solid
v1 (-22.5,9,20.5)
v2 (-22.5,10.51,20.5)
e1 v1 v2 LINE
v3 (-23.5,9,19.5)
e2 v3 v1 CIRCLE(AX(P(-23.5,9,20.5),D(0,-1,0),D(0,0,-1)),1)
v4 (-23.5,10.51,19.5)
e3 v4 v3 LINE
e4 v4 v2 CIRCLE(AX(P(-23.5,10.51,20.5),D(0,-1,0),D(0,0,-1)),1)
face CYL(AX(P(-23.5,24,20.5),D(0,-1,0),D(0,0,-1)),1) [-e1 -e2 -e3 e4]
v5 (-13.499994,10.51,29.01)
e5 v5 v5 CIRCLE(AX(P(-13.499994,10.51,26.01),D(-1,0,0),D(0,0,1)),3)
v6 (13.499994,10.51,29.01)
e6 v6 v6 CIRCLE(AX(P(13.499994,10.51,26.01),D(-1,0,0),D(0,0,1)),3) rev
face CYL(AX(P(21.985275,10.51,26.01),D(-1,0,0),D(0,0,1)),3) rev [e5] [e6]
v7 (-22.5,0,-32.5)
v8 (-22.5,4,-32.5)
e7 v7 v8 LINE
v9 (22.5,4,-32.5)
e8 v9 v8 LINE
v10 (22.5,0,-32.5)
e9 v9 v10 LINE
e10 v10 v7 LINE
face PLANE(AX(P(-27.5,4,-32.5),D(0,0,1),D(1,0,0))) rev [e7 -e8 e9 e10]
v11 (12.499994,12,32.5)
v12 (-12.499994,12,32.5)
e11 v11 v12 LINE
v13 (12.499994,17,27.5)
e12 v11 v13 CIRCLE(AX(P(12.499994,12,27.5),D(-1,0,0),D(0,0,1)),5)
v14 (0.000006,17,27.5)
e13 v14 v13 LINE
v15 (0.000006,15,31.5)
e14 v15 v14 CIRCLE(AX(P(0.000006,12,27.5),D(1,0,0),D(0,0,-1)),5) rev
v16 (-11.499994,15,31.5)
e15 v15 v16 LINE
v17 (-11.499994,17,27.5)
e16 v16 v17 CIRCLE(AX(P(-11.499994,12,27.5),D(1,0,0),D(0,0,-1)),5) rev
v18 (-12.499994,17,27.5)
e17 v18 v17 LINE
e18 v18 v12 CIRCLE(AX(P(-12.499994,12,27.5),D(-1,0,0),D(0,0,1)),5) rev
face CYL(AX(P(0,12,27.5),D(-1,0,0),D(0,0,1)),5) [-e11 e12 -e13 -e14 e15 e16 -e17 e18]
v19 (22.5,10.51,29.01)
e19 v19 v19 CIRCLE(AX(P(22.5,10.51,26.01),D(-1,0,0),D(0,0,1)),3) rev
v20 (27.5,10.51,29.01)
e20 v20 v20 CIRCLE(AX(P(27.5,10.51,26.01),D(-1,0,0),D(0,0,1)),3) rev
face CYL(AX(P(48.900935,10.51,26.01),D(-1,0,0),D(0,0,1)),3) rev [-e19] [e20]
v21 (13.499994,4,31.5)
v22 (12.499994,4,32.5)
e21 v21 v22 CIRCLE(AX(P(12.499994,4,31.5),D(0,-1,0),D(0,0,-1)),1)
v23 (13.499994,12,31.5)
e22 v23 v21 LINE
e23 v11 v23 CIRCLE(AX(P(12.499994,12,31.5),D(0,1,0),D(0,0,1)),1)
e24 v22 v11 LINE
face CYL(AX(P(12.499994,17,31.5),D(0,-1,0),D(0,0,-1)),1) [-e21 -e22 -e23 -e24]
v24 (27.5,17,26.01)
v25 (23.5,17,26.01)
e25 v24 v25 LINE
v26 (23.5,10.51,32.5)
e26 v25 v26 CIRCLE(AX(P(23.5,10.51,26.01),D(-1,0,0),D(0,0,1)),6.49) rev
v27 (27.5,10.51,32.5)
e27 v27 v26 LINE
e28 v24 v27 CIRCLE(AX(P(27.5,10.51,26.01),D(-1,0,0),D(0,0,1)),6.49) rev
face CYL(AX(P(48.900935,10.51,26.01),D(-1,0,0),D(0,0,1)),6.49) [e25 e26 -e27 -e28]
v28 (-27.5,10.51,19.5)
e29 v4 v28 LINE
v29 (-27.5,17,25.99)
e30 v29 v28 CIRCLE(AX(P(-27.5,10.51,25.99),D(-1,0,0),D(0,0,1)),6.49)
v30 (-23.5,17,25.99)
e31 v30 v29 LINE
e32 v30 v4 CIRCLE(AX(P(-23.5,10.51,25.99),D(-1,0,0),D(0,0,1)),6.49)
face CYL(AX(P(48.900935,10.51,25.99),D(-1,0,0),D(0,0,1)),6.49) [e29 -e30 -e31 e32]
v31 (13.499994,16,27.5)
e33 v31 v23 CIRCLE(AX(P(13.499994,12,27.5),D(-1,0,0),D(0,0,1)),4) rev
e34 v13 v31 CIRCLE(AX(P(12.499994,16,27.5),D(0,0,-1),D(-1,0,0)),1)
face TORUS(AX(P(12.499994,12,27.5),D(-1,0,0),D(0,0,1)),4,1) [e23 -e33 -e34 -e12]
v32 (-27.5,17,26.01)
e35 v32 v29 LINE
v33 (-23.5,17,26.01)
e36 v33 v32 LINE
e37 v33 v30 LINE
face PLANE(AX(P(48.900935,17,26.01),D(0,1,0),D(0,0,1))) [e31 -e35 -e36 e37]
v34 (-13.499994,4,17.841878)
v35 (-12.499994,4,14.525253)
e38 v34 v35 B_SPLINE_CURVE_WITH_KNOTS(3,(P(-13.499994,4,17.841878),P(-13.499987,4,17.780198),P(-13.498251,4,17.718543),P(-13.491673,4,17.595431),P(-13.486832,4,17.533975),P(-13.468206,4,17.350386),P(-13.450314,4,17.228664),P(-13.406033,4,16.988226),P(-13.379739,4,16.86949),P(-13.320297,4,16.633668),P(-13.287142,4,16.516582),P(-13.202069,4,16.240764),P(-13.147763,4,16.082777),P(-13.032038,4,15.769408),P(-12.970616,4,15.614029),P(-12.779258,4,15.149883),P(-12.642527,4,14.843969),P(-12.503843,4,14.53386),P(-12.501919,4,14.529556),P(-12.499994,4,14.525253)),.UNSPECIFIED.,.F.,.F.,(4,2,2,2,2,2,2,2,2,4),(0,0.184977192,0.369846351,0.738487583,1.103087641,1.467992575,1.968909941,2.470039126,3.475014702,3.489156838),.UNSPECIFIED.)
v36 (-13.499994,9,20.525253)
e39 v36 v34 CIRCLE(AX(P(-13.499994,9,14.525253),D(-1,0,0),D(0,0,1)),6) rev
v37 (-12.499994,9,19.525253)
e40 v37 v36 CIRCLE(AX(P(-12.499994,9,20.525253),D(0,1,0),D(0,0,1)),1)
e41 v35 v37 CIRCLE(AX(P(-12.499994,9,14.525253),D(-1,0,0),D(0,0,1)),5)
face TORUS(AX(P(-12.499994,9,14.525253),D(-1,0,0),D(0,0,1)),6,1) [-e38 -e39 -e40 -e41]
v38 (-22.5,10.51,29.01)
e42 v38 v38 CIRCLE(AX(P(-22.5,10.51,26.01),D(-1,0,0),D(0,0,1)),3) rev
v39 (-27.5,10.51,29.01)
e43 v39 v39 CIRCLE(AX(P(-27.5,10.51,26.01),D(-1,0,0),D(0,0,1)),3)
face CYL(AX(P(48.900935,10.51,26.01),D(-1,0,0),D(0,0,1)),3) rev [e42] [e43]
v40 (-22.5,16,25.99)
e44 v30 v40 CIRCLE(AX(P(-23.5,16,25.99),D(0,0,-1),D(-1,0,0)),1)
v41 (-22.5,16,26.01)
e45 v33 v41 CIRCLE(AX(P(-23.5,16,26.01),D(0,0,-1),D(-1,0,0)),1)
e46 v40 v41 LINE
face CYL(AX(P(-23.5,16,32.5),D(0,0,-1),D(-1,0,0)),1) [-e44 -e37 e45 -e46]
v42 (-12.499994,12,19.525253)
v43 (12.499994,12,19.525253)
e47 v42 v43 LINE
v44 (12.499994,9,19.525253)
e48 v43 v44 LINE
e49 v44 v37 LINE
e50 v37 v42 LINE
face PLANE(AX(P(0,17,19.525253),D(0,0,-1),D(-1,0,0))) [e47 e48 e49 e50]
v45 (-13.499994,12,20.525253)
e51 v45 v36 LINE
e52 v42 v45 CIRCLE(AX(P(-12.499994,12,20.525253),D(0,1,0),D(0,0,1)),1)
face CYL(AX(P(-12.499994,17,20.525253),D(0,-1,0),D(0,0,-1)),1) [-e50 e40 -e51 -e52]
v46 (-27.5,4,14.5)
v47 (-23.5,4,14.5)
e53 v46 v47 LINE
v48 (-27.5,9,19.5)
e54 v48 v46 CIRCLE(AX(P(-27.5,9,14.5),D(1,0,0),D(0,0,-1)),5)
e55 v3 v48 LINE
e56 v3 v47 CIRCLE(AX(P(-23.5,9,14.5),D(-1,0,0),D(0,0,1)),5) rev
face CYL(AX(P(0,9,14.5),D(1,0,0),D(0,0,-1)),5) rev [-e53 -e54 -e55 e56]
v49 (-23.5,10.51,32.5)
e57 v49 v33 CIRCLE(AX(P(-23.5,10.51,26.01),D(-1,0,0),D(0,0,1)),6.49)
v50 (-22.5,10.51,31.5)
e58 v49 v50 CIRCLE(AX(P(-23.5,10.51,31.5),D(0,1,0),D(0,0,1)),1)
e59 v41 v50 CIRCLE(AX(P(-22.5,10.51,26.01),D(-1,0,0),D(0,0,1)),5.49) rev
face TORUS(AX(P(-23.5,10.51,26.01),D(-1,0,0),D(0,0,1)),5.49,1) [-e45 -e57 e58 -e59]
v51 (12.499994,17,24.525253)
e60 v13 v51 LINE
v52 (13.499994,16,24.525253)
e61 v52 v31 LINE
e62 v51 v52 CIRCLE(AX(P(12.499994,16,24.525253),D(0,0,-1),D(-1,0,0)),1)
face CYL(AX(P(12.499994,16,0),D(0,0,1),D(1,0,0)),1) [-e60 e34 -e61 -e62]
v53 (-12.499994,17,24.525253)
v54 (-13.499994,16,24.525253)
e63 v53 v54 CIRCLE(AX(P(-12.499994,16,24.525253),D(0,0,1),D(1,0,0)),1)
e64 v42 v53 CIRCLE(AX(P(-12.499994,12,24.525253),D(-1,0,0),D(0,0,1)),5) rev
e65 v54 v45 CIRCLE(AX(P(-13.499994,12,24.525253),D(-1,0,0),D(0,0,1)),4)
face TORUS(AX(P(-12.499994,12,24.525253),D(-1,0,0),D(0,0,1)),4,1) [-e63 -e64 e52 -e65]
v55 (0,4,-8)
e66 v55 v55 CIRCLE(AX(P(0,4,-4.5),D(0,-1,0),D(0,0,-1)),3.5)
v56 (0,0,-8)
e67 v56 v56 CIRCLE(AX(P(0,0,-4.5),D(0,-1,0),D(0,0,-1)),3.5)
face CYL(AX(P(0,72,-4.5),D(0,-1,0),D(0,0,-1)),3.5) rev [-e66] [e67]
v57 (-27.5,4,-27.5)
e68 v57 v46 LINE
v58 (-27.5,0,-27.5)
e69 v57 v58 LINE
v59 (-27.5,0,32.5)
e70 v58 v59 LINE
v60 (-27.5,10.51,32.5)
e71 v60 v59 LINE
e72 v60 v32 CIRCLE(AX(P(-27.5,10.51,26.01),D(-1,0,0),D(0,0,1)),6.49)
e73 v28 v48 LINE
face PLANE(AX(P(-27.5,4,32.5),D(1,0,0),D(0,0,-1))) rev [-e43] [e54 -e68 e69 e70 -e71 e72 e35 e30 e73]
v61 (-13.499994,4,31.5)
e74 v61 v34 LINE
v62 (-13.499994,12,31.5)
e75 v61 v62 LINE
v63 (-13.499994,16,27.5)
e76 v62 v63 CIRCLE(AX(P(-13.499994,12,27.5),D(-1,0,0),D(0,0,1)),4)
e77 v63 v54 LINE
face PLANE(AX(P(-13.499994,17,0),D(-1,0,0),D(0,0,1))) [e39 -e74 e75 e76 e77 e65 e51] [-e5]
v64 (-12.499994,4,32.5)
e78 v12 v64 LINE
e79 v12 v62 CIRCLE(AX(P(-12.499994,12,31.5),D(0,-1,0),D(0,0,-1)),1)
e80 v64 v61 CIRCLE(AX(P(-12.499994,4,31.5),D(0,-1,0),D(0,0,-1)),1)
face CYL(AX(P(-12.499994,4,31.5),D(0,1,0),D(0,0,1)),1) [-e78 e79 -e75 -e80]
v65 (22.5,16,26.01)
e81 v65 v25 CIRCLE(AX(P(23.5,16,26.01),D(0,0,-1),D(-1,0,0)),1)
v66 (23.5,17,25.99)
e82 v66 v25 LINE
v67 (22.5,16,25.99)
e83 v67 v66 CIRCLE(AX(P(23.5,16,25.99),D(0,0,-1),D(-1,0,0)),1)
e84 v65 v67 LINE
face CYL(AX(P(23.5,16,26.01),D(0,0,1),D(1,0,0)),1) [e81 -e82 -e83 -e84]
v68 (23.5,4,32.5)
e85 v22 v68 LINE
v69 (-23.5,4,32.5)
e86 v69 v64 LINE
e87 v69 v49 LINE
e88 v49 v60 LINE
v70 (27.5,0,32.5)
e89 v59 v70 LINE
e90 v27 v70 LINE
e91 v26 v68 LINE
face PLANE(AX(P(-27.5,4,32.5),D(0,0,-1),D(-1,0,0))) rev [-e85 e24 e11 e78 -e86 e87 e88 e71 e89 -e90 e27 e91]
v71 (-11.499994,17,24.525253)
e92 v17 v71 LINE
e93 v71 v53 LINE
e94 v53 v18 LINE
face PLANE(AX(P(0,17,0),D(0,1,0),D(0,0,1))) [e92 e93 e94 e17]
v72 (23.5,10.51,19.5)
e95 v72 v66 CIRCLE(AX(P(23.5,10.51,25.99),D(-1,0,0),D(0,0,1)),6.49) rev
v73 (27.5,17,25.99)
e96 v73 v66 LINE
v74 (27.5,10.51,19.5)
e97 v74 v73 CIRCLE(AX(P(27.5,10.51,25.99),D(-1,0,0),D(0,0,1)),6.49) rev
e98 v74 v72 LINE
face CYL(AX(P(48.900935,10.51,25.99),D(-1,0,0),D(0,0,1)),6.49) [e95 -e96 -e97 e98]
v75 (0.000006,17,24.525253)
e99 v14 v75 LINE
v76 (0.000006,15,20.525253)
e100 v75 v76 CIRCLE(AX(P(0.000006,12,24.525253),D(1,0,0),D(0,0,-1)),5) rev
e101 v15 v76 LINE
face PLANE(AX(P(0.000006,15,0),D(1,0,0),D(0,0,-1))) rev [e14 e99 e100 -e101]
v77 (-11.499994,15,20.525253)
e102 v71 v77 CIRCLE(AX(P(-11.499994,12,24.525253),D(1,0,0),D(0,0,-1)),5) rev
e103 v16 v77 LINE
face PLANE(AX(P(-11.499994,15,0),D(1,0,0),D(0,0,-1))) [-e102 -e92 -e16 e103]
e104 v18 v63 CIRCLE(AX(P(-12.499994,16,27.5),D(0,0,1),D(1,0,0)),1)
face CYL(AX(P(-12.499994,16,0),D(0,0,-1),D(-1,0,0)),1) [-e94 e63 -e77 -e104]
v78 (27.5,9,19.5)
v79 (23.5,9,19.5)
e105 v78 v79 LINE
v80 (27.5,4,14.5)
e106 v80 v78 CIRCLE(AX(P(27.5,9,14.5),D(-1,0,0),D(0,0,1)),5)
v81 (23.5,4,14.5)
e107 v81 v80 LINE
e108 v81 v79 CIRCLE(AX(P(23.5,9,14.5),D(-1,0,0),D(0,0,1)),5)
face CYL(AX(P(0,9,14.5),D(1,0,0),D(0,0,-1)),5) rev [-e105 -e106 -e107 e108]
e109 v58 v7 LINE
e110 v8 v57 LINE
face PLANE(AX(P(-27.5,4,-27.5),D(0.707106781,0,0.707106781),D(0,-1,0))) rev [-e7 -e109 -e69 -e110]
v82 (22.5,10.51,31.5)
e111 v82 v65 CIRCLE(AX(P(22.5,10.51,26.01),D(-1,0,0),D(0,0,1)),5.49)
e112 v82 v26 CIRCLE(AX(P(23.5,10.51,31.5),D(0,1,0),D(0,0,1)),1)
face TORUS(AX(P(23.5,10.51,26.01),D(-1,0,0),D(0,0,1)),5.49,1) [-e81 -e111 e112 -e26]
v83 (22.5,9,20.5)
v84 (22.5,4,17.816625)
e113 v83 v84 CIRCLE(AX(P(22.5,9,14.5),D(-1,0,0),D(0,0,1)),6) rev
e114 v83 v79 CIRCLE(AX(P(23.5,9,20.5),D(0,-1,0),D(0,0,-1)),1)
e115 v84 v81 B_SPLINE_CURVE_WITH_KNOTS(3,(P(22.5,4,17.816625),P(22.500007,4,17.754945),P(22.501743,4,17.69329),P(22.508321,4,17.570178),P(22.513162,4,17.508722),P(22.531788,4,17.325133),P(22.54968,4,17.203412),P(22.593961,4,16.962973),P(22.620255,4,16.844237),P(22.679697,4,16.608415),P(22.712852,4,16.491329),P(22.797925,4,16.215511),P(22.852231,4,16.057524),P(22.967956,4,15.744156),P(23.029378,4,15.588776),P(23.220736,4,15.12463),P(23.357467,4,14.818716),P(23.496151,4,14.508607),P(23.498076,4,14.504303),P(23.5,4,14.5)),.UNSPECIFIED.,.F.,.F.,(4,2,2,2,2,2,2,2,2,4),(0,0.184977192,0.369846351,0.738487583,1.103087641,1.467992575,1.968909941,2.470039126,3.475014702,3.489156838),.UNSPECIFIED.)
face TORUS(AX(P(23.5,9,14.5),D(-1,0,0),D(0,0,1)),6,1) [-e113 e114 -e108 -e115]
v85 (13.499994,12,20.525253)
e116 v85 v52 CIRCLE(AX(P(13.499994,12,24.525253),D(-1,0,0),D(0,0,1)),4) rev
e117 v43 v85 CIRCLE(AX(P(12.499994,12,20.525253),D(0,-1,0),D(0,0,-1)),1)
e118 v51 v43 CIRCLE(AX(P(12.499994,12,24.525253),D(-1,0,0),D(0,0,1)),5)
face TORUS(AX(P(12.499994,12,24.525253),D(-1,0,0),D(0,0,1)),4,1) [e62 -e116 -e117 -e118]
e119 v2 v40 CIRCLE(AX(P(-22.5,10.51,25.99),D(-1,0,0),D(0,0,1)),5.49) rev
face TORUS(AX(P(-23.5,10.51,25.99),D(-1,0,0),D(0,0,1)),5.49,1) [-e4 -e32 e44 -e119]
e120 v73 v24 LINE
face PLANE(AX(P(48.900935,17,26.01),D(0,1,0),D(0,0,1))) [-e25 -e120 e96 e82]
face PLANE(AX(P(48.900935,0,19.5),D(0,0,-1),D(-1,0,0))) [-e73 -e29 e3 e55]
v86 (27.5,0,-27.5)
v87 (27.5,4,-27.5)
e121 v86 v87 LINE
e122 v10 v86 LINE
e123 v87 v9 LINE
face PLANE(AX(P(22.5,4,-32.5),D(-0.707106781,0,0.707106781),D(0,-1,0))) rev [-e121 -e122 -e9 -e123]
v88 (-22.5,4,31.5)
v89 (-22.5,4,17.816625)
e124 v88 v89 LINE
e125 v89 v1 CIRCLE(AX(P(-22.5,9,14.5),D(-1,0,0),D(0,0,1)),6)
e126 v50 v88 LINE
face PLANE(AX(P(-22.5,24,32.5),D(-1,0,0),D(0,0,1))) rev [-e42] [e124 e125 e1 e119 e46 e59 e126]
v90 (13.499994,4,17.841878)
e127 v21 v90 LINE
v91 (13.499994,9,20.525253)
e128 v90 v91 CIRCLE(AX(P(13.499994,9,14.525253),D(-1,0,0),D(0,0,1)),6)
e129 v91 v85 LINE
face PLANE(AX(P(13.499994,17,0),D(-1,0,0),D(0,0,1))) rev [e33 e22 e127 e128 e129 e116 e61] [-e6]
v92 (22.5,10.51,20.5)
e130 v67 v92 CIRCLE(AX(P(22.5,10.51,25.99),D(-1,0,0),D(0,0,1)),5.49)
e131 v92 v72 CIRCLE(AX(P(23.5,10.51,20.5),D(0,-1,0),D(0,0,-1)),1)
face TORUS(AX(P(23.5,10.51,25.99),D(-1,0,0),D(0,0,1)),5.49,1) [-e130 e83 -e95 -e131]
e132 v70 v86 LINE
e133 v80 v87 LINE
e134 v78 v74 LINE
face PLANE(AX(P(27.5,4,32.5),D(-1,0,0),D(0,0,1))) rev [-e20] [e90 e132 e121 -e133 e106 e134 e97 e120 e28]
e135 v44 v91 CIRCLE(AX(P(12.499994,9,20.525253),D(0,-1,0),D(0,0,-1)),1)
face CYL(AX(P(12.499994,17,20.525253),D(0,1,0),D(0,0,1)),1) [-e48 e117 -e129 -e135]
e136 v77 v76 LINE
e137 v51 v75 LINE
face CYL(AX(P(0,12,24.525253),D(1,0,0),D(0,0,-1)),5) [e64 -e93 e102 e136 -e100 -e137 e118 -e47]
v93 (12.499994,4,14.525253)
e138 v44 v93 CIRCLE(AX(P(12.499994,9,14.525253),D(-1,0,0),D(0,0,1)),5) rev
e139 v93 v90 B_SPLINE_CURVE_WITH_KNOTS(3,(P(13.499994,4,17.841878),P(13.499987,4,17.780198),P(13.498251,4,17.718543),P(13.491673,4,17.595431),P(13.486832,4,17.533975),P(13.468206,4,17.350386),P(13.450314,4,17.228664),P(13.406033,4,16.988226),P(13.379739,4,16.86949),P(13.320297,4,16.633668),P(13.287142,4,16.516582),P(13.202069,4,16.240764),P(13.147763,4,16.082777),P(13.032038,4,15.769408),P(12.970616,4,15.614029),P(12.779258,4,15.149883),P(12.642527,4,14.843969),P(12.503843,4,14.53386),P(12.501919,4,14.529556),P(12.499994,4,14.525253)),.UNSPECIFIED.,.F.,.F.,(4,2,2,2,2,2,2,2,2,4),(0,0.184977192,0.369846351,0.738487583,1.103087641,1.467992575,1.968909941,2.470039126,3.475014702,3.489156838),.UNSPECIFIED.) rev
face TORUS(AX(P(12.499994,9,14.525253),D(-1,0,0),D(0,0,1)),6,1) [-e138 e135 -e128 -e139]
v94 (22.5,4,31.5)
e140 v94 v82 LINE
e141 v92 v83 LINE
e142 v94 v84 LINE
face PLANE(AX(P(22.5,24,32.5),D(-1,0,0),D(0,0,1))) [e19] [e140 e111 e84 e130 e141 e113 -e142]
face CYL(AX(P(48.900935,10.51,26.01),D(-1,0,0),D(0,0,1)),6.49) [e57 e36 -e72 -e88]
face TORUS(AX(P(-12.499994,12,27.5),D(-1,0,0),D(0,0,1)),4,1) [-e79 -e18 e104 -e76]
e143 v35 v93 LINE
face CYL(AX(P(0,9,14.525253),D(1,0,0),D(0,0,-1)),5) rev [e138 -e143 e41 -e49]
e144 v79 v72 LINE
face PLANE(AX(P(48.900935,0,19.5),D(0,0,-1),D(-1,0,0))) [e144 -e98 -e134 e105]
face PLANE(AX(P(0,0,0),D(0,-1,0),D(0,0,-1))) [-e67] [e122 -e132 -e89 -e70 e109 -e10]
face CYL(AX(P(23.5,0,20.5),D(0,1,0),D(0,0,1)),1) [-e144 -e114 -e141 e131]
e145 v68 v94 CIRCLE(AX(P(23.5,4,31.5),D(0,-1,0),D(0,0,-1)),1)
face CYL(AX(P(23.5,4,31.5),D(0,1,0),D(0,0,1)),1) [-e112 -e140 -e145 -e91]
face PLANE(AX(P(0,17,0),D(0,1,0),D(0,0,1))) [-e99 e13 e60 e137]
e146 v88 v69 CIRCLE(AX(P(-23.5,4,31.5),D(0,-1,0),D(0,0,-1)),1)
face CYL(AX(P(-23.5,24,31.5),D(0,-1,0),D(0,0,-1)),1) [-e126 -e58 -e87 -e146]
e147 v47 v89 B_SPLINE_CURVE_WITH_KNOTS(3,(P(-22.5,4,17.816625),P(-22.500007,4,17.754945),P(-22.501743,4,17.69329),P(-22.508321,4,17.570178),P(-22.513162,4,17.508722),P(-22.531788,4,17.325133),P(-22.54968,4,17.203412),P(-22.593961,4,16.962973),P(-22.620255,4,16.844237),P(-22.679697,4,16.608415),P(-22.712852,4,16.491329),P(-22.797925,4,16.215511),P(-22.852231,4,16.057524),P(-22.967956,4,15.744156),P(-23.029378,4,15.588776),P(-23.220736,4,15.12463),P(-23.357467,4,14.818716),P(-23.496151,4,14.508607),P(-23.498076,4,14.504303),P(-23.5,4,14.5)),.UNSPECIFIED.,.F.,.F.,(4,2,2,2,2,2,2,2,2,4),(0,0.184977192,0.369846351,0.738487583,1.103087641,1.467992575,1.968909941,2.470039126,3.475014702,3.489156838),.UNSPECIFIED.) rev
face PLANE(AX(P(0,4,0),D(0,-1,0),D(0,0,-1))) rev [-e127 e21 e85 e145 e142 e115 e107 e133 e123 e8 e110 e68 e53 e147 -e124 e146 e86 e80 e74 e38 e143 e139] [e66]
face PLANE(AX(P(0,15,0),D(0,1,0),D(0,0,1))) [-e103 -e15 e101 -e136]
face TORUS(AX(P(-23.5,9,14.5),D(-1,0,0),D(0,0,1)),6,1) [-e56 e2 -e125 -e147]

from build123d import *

# Parameters (mm, degrees)
CROQUIS1_W              = 55
CROQUIS1_H              = 65
SALIENTE_EXTRUIR1_DEPTH = 4
CROQUIS5_R              = 3.5
CORTAR_EXTRUIR5_DEPTH   = 72
CHAFL_N1_SIZE           = 5
CROQUIS6_R              = 3
SALIENTE_EXTRUIR2_DEPTH = 55
REDONDEO1_R             = 5
CROQUIS7_W              = 45
CROQUIS7_H              = 13
CROQUIS7_H_2            = 7.525704533
CORTAR_EXTRUIR7_DEPTH   = 20
REDONDEO2_R             = 1
CROQUIS8_W              = 13.499994095
CROQUIS8_H              = 12.974747115
SALIENTE_EXTRUIR3_DEPTH = 13
REDONDEO3_R             = 5
REDONDEO4_R             = 5
REDONDEO5_R             = 1
CROQUIS10_R             = 3
CORTAR_EXTRUIR8_DEPTH   = 26.999988191
CROQUIS11_W             = 11.5
CROQUIS11_H             = 5.447296535
CROQUIS11_H_2           = 2.974747115
CORTAR_EXTRUIR9_DEPTH   = 2


with BuildPart() as part:
    # Croquis1 → Saliente-Extruir1 (new body)
    with BuildSketch(Plane(origin=(0, 0, 0), x_dir=(1, 0, 0), z_dir=(0, 1, 0))):
        Rectangle(CROQUIS1_W, CROQUIS1_H)
    extrude(amount=SALIENTE_EXTRUIR1_DEPTH)

    # Croquis5 → Cortar-Extruir5 (cut)
    with BuildSketch(Plane.XZ):
        with Locations(Location((0, -4.5, 0), (0, 0, 270))):
            Circle(CROQUIS5_R)
    extrude(amount=-CORTAR_EXTRUIR5_DEPTH, mode=Mode.SUBTRACT)

    # Chaflán1
    chafl_n1_edges = [part.edges().sort_by_distance(p)[0] for p in [
        (-27.5, 2, -32.5),
        (27.5, 2, -32.5),
    ]]
    chamfer(chafl_n1_edges, length=CHAFL_N1_SIZE)

    # Croquis6 → Saliente-Extruir2 (add)
    with BuildSketch(Plane.ZY.offset(27.5)):
        with BuildLine():
            Line((32.5, 0), (19.5, 0))
            Line((19.5, 0), (19.5, 10.51))
            ThreePointArc((19.5, 10.51), (21.40087699, 15.09912301), (25.99, 17))
            Line((25.99, 17), (26.01, 17))
            ThreePointArc((26.01, 17), (30.59912301, 15.09912301), (32.5, 10.51))
            Line((32.5, 10.51), (32.5, 0))
        make_face()
        with Locations((26.01, 10.51)):
            Circle(CROQUIS6_R, mode=Mode.SUBTRACT)
    extrude(amount=-SALIENTE_EXTRUIR2_DEPTH)

    # Redondeo1
    redondeo1_edges = [part.edges().sort_by_distance(p)[0] for p in [
        (0, 4, 19.5),
    ]]
    fillet(redondeo1_edges, radius=REDONDEO1_R)

    # Croquis7 → Cortar-Extruir7 (cut)
    with BuildSketch(Plane(origin=(0, 4, 0), x_dir=(1, 0, 0), z_dir=(0, 1, 0))):
        with Locations((0, -26)):
            Rectangle(CROQUIS7_W, CROQUIS7_H)
        with Locations((0, -15.737147734)):
            Rectangle(CROQUIS7_W, CROQUIS7_H_2)
    extrude(amount=CORTAR_EXTRUIR7_DEPTH, mode=Mode.SUBTRACT)

    # Redondeo2
    # the kernel refuses this fillet: 1 mm, written as the material it takes off along each edge
    with BuildSketch(Plane(origin=(22.5, 9, 14.5), x_dir=(0, 0, 1), z_dir=(0, 1, 0))) as redondeo2_piece_1_section:
        with BuildLine():
            CenterArc((5 + REDONDEO2_R, REDONDEO2_R), REDONDEO2_R, 180, 90)
            Line((5 + REDONDEO2_R, 0), (5, 0))
            Line((5, 0), (5, REDONDEO2_R))
        make_face()
    redondeo2_piece_1 = revolve(axis=Axis((22.5, 9, 14.5), (1, 0, 0)), revolution_arc=138.720976341, mode=Mode.PRIVATE)
    redondeo2_piece_1 = split(redondeo2_piece_1, bisect_by=Plane(origin=(22.5, 4, 14.5), z_dir=(0, 1, 0)), keep=Keep.TOP, mode=Mode.PRIVATE)
    add(redondeo2_piece_1, mode=Mode.SUBTRACT)
    with BuildSketch(Plane(origin=(-22.5, 9, 14.5), x_dir=(0, 0, 1), z_dir=(0, 1, 0))) as redondeo2_piece_2_section:
        with BuildLine():
            CenterArc((5 + REDONDEO2_R, -REDONDEO2_R), REDONDEO2_R, 90, 90)
            Line((5 + REDONDEO2_R, 0), (5, 0))
            Line((5, 0), (5, -REDONDEO2_R))
        make_face()
    redondeo2_piece_2 = revolve(axis=Axis((-22.5, 9, 14.5), (1, 0, 0)), revolution_arc=138.720976341, mode=Mode.PRIVATE)
    redondeo2_piece_2 = split(redondeo2_piece_2, bisect_by=Plane(origin=(-22.5, 4, 14.5), z_dir=(0, 1, 0)), keep=Keep.TOP, mode=Mode.PRIVATE)
    add(redondeo2_piece_2, mode=Mode.SUBTRACT)
    with BuildSketch(Plane(origin=(-22.5, 4, 32.5), x_dir=(-1, 0, 0), z_dir=(0, 1, 0))) as redondeo2_piece_3:
        with BuildLine():
            CenterArc((REDONDEO2_R, -REDONDEO2_R), REDONDEO2_R, 90, 90)
            Line((0, -REDONDEO2_R), (0, 0))
            Line((0, 0), (REDONDEO2_R, 0))
        make_face()
    extrude(amount=6.51, mode=Mode.SUBTRACT)
    with BuildSketch(Plane(origin=(-22.5, 17, 25.99), x_dir=(-1, 0, 0), z_dir=(0, 0, 1))) as redondeo2_piece_4:
        with BuildLine():
            CenterArc((REDONDEO2_R, REDONDEO2_R), REDONDEO2_R, 180, 90)
            Line((0, REDONDEO2_R), (0, 0))
            Line((0, 0), (REDONDEO2_R, 0))
        make_face()
    extrude(amount=0.02, mode=Mode.SUBTRACT)
    with BuildSketch(Plane(origin=(-22.5, 10.51, 26.01), x_dir=(0, 0, 1), z_dir=(0, -1, 0))) as redondeo2_piece_5:
        with BuildLine():
            CenterArc((6.49 - REDONDEO2_R, REDONDEO2_R), REDONDEO2_R, 270, 90)
            Line((6.49 - REDONDEO2_R, 0), (6.49, 0))
            Line((6.49, 0), (6.49, REDONDEO2_R))
        make_face()
    revolve(axis=Axis((-22.5, 10.51, 26.01), (-1, 0, 0)), revolution_arc=90, mode=Mode.SUBTRACT)
    with BuildSketch(Plane(origin=(-22.5, 9, 19.5), x_dir=(-1, 0, 0), z_dir=(0, 1, 0))) as redondeo2_piece_6:
        with BuildLine():
            CenterArc((REDONDEO2_R, REDONDEO2_R), REDONDEO2_R, 180, 90)
            Line((0, REDONDEO2_R), (0, 0))
            Line((0, 0), (REDONDEO2_R, 0))
        make_face()
    extrude(amount=1.51, mode=Mode.SUBTRACT)
    with BuildSketch(Plane(origin=(-22.5, 10.51, 25.99), x_dir=(0, 1, 0), z_dir=(0, 0, 1))) as redondeo2_piece_7:
        with BuildLine():
            CenterArc((6.49 - REDONDEO2_R, REDONDEO2_R), REDONDEO2_R, 270, 90)
            Line((6.49 - REDONDEO2_R, 0), (6.49, 0))
            Line((6.49, 0), (6.49, REDONDEO2_R))
        make_face()
    revolve(axis=Axis((-22.5, 10.51, 25.99), (-1, 0, 0)), revolution_arc=90, mode=Mode.SUBTRACT)
    with BuildSketch(Plane(origin=(22.5, 17, 26.01), x_dir=(0, -1, 0), z_dir=(0, 0, -1))) as redondeo2_piece_8:
        with BuildLine():
            CenterArc((REDONDEO2_R, -REDONDEO2_R), REDONDEO2_R, 90, 90)
            Line((0, -REDONDEO2_R), (0, 0))
            Line((0, 0), (REDONDEO2_R, 0))
        make_face()
    extrude(amount=0.02, mode=Mode.SUBTRACT)
    with BuildSketch(Plane(origin=(22.5, 10.51, 26.01), x_dir=(0, 0, 1), z_dir=(0, -1, 0))) as redondeo2_piece_9:
        with BuildLine():
            CenterArc((6.49 - REDONDEO2_R, -REDONDEO2_R), REDONDEO2_R, 0, 90)
            Line((6.49 - REDONDEO2_R, 0), (6.49, 0))
            Line((6.49, 0), (6.49, -REDONDEO2_R))
        make_face()
    revolve(axis=Axis((22.5, 10.51, 26.01), (-1, 0, 0)), revolution_arc=90, mode=Mode.SUBTRACT)
    with BuildSketch(Plane(origin=(22.5, 4, 32.5), x_dir=(1, 0, 0), z_dir=(0, 1, 0))) as redondeo2_piece_10:
        with BuildLine():
            CenterArc((REDONDEO2_R, REDONDEO2_R), REDONDEO2_R, 180, 90)
            Line((0, REDONDEO2_R), (0, 0))
            Line((0, 0), (REDONDEO2_R, 0))
        make_face()
    extrude(amount=6.51, mode=Mode.SUBTRACT)
    with BuildSketch(Plane(origin=(22.5, 10.51, 19.5), x_dir=(0, 0, 1), z_dir=(0, -1, 0))) as redondeo2_piece_11:
        with BuildLine():
            CenterArc((REDONDEO2_R, -REDONDEO2_R), REDONDEO2_R, 90, 90)
            Line((0, -REDONDEO2_R), (0, 0))
            Line((0, 0), (REDONDEO2_R, 0))
        make_face()
    extrude(amount=1.51, mode=Mode.SUBTRACT)
    with BuildSketch(Plane(origin=(22.5, 10.51, 25.99), x_dir=(0, 1, 0), z_dir=(0, 0, 1))) as redondeo2_piece_12:
        with BuildLine():
            CenterArc((6.49 - REDONDEO2_R, -REDONDEO2_R), REDONDEO2_R, 0, 90)
            Line((6.49, -REDONDEO2_R), (6.49, 0))
            Line((6.49, 0), (6.49 - REDONDEO2_R, 0))
        make_face()
    revolve(axis=Axis((22.5, 10.51, 25.99), (-1, 0, 0)), revolution_arc=90, mode=Mode.SUBTRACT)

    # Croquis8 → Saliente-Extruir3 (add)
    with BuildSketch(Plane(origin=(0, 4, 0), x_dir=(1, 0, 0), z_dir=(0, 1, 0))):
        with Locations((-6.749997048, -26.012626443)):
            Rectangle(CROQUIS8_W, CROQUIS8_H)
        with Locations((6.749997048, -26.012626443)):
            Rectangle(CROQUIS8_W, CROQUIS8_H)
    extrude(amount=SALIENTE_EXTRUIR3_DEPTH)

    # Redondeo3
    redondeo3_edges = [part.edges().sort_by_distance(p)[0] for p in [
        (0, 17, 19.525252885),
        (0, 17, 32.5),
    ]]
    fillet(redondeo3_edges, radius=REDONDEO3_R)

    # Redondeo4
    redondeo4_edges = [part.edges().sort_by_distance(p)[0] for p in [
        (0, 4, 19.525252885),
    ]]
    fillet(redondeo4_edges, radius=REDONDEO4_R)

    # Redondeo5
    # the kernel refuses this fillet: 1 mm, written as the material it takes off along each edge
    with BuildSketch(Plane(origin=(-13.499994095, 9, 19.525252885), x_dir=(0, 0, 1), z_dir=(0, 1, 0))) as redondeo5_piece_1:
        with BuildLine():
            CenterArc((REDONDEO5_R, REDONDEO5_R), REDONDEO5_R, 180, 90)
            Line((0, REDONDEO5_R), (0, 0))
            Line((0, 0), (REDONDEO5_R, 0))
        make_face()
    extrude(amount=3, mode=Mode.SUBTRACT)
    with BuildSketch(Plane(origin=(13.499994095, 9, 19.525252885), x_dir=(0, 0, 1), z_dir=(0, 1, 0))) as redondeo5_piece_2:
        with BuildLine():
            CenterArc((REDONDEO5_R, -REDONDEO5_R), REDONDEO5_R, 90, 90)
            Line((0, -REDONDEO5_R), (0, 0))
            Line((0, 0), (REDONDEO5_R, 0))
        make_face()
    extrude(amount=3, mode=Mode.SUBTRACT)
    with BuildSketch(Plane(origin=(13.499994095, 17, 27.5), x_dir=(0, -1, 0), z_dir=(0, 0, -1)), Plane(origin=(-13.499994095, 17, 24.525252885), x_dir=(0, -1, 0), z_dir=(0, 0, 1))) as redondeo5_piece_3:
        with BuildLine():
            CenterArc((REDONDEO5_R, REDONDEO5_R), REDONDEO5_R, 180, 90)
            Line((0, REDONDEO5_R), (0, 0))
            Line((0, 0), (REDONDEO5_R, 0))
        make_face()
    extrude(amount=2.974747115, mode=Mode.SUBTRACT)
    with BuildSketch(Plane(origin=(13.499994095, 4, 32.5), x_dir=(0, 0, -1), z_dir=(0, 1, 0))) as redondeo5_piece_4:
        with BuildLine():
            CenterArc((REDONDEO5_R, REDONDEO5_R), REDONDEO5_R, 180, 90)
            Line((0, REDONDEO5_R), (0, 0))
            Line((0, 0), (REDONDEO5_R, 0))
        make_face()
    extrude(amount=8, mode=Mode.SUBTRACT)
    with BuildSketch(Plane(origin=(13.499994095, 12, 27.5), x_dir=(0, 0, 1), z_dir=(0, -1, 0))) as redondeo5_piece_5:
        with BuildLine():
            CenterArc((5 - REDONDEO5_R, REDONDEO5_R), REDONDEO5_R, 270, 90)
            Line((5, REDONDEO5_R), (5, 0))
            Line((5, 0), (5 - REDONDEO5_R, 0))
        make_face()
    revolve(axis=Axis((13.499994095, 12, 27.5), (-1, 0, 0)), revolution_arc=90, mode=Mode.SUBTRACT)
    with BuildSketch(Plane(origin=(13.499994095, 12, 24.525252885), x_dir=(0, 0, -1), z_dir=(0, -1, 0))) as redondeo5_piece_6:
        with BuildLine():
            CenterArc((5 - REDONDEO5_R, -REDONDEO5_R), REDONDEO5_R, 0, 90)
            Line((5, -REDONDEO5_R), (5, 0))
            Line((5, 0), (5 - REDONDEO5_R, 0))
        make_face()
    revolve(axis=Axis((13.499994095, 12, 24.525252885), (1, 0, 0)), revolution_arc=90, mode=Mode.SUBTRACT)
    with BuildSketch(Plane(origin=(-13.499994095, 4, 32.5), x_dir=(0, 0, -1), z_dir=(0, 1, 0))) as redondeo5_piece_7:
        with BuildLine():
            CenterArc((REDONDEO5_R, -REDONDEO5_R), REDONDEO5_R, 90, 90)
            Line((0, -REDONDEO5_R), (0, 0))
            Line((0, 0), (REDONDEO5_R, 0))
        make_face()
    extrude(amount=8, mode=Mode.SUBTRACT)
    with BuildSketch(Plane(origin=(-13.499994095, 12, 27.5), x_dir=(0, 0, 1), z_dir=(0, -1, 0))) as redondeo5_piece_8:
        with BuildLine():
            CenterArc((5 - REDONDEO5_R, -REDONDEO5_R), REDONDEO5_R, 0, 90)
            Line((5, -REDONDEO5_R), (5, 0))
            Line((5, 0), (5 - REDONDEO5_R, 0))
        make_face()
    revolve(axis=Axis((-13.499994095, 12, 27.5), (-1, 0, 0)), revolution_arc=90, mode=Mode.SUBTRACT)
    with BuildSketch(Plane(origin=(-13.499994095, 12, 24.525252885), x_dir=(0, 0, -1), z_dir=(0, -1, 0))) as redondeo5_piece_9:
        with BuildLine():
            CenterArc((5 - REDONDEO5_R, REDONDEO5_R), REDONDEO5_R, 270, 90)
            Line((5, REDONDEO5_R), (5, 0))
            Line((5, 0), (5 - REDONDEO5_R, 0))
        make_face()
    revolve(axis=Axis((-13.499994095, 12, 24.525252885), (1, 0, 0)), revolution_arc=90, mode=Mode.SUBTRACT)
    with BuildSketch(Plane(origin=(13.499994095, 9, 14.525252885), x_dir=(0, -0.6597265812708417, -0.7515057138603056), z_dir=(0, 0.7515057138603056, -0.6597265812708417))) as redondeo5_piece_10_section:
        with BuildLine():
            CenterArc((5 + REDONDEO5_R, REDONDEO5_R), REDONDEO5_R, 180, 90)
            Line((5 + REDONDEO5_R, 0), (5, 0))
            Line((5, 0), (5, REDONDEO5_R))
        make_face()
    redondeo5_piece_10 = revolve(axis=Axis((13.499994095, 9, 14.525252885), (-1, 0, 0)), revolution_arc=138.720976341, mode=Mode.PRIVATE)
    redondeo5_piece_10 = split(redondeo5_piece_10, bisect_by=Plane(origin=(13.499994095, 4, 14.525252885), z_dir=(0, 1, 0)), keep=Keep.TOP, mode=Mode.PRIVATE)
    add(redondeo5_piece_10, mode=Mode.SUBTRACT)
    with BuildSketch(Plane(origin=(-13.499994095, 9, 14.525252885), x_dir=(0, -0.6597265812708417, -0.7515057138603056), z_dir=(0, 0.7515057138603056, -0.6597265812708417))) as redondeo5_piece_11_section:
        with BuildLine():
            CenterArc((5 + REDONDEO5_R, -REDONDEO5_R), REDONDEO5_R, 90, 90)
            Line((5, -REDONDEO5_R), (5, 0))
            Line((5, 0), (5 + REDONDEO5_R, 0))
        make_face()
    redondeo5_piece_11 = revolve(axis=Axis((-13.499994095, 9, 14.525252885), (-1, 0, 0)), revolution_arc=138.720976341, mode=Mode.PRIVATE)
    redondeo5_piece_11 = split(redondeo5_piece_11, bisect_by=Plane(origin=(-13.499994095, 4, 14.525252885), z_dir=(0, 1, 0)), keep=Keep.TOP, mode=Mode.PRIVATE)
    add(redondeo5_piece_11, mode=Mode.SUBTRACT)

    # Croquis10 → Cortar-Extruir8 (cut)
    with BuildSketch(Plane.ZY.offset(13.499994095)):
        with Locations((26.01, 10.51)):
            Circle(CROQUIS10_R)
    extrude(amount=-CORTAR_EXTRUIR8_DEPTH, mode=Mode.SUBTRACT)

    # Croquis11 → Cortar-Extruir9 (cut)
    with BuildSketch(Plane(origin=(0, 17, 0), x_dir=(1, 0, 0), z_dir=(0, 1, 0))):
        with Locations((-5.749994095, -21.801604618)):
            Rectangle(CROQUIS11_W, CROQUIS11_H)
        with Locations((-5.749994095, -26.012626443)):
            Rectangle(CROQUIS11_W, CROQUIS11_H_2)
        with Locations((-5.749994095, -30.223648267)):
            Rectangle(CROQUIS11_W, CROQUIS11_H)
    extrude(amount=-CORTAR_EXTRUIR9_DEPTH, mode=Mode.SUBTRACT)


solid = part.part
